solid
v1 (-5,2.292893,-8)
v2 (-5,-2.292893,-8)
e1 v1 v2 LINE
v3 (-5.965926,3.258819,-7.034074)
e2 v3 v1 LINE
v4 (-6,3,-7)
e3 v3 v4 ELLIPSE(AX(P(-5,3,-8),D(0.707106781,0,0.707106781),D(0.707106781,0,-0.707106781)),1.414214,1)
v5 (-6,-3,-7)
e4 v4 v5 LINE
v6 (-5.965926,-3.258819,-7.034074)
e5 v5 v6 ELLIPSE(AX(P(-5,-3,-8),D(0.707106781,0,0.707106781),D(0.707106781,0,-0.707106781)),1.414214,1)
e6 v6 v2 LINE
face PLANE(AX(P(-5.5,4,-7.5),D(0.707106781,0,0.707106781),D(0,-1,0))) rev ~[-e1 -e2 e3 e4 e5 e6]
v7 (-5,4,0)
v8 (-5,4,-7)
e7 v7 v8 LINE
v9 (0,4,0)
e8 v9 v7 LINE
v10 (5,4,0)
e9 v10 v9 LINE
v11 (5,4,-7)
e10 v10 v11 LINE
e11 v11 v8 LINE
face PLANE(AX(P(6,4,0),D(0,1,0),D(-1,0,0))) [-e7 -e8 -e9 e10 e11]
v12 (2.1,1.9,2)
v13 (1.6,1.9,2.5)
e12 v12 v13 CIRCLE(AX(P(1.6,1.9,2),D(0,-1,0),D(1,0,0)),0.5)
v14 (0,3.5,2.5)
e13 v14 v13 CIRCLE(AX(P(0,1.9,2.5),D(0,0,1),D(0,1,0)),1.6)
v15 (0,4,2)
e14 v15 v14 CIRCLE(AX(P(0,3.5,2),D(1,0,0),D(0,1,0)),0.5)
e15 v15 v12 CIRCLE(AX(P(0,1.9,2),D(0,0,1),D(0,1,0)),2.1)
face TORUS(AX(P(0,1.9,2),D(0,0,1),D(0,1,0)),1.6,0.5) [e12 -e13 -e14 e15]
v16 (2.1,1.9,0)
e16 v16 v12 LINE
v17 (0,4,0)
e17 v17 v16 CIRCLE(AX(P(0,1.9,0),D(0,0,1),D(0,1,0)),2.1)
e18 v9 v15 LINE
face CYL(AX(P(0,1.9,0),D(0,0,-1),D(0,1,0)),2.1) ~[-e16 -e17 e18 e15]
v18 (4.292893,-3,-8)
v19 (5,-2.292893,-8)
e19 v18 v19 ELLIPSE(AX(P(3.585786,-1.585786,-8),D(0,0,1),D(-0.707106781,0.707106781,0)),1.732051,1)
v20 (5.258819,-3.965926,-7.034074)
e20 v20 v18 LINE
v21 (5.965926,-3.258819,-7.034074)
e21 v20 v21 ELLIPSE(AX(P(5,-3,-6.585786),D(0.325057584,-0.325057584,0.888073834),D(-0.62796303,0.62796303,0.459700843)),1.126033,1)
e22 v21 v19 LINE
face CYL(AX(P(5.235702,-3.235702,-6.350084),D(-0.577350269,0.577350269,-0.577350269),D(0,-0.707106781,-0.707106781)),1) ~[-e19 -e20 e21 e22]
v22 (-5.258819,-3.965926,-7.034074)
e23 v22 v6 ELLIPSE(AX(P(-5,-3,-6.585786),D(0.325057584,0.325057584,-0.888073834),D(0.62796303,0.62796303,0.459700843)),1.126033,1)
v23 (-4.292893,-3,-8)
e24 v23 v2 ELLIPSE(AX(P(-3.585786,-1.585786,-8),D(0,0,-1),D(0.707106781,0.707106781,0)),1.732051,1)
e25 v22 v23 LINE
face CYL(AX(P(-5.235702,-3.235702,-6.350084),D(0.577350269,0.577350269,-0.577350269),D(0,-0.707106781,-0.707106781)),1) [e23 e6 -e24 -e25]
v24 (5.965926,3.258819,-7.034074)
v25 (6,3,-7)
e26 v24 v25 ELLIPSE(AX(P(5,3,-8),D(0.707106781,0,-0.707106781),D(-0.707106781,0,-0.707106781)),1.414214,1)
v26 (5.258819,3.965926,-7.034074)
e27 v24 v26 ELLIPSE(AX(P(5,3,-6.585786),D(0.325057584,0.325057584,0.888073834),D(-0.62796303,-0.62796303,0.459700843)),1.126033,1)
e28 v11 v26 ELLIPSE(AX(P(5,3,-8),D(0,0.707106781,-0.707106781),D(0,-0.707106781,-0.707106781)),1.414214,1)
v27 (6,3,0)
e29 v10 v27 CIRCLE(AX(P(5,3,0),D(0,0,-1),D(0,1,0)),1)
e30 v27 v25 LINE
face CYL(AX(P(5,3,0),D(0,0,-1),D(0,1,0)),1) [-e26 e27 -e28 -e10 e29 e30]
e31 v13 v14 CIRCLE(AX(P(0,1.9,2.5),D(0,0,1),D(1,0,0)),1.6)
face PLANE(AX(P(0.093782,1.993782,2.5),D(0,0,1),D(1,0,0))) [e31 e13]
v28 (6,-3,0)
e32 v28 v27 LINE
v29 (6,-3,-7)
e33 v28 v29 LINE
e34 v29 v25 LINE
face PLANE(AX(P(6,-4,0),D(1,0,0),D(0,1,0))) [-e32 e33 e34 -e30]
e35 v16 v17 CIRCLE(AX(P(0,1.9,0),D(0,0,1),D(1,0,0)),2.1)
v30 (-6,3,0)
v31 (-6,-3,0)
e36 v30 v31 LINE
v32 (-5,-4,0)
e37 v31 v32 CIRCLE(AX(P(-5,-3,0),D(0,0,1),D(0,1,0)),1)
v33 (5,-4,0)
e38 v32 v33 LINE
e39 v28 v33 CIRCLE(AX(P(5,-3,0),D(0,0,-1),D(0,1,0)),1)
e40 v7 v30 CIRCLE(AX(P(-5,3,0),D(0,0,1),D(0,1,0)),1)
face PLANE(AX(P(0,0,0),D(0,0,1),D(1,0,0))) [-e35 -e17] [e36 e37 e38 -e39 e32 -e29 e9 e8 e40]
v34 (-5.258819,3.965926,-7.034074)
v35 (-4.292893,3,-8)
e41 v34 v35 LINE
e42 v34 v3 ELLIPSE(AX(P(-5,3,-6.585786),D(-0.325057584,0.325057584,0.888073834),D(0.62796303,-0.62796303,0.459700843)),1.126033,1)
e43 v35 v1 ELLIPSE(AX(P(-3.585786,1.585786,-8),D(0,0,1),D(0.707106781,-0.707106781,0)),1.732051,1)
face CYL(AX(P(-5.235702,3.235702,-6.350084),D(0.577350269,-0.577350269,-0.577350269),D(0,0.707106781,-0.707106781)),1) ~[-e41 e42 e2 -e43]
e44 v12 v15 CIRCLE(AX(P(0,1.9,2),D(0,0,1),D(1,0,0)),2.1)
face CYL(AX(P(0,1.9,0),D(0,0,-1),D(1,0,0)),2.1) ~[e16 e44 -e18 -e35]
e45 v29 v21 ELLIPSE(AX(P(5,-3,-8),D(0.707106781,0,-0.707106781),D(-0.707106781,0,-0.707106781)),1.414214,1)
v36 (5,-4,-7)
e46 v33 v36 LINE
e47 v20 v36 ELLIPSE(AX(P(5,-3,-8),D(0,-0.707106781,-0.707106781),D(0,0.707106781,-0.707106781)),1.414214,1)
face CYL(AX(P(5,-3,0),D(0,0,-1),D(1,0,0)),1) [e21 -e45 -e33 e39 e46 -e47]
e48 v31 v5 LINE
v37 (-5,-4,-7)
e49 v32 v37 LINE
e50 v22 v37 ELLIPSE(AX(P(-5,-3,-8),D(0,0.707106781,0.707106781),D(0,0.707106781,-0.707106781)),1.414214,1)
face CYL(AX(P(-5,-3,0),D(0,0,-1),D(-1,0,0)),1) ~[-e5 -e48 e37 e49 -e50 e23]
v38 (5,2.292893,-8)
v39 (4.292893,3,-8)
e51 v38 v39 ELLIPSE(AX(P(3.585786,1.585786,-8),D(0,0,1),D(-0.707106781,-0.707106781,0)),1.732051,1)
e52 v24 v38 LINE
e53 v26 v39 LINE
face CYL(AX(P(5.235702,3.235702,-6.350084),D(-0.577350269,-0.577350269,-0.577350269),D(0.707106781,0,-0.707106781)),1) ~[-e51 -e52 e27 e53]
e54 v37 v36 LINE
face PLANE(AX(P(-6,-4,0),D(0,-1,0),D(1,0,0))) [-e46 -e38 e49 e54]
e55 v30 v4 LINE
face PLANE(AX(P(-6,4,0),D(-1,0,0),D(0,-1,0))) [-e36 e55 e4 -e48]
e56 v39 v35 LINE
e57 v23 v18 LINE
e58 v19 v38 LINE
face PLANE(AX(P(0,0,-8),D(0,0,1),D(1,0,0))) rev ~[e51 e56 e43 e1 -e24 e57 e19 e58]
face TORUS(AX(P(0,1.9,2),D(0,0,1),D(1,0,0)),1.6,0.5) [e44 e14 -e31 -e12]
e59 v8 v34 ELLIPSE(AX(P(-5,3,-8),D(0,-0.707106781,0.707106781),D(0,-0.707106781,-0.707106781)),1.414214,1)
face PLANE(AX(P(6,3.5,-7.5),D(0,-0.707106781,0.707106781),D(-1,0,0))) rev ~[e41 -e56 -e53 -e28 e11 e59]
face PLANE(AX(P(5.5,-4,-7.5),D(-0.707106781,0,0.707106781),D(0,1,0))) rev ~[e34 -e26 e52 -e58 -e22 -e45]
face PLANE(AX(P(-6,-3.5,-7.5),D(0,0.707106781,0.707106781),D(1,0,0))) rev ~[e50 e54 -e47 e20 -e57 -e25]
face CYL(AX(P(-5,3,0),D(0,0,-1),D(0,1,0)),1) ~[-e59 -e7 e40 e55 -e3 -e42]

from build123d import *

# Parameters (mm, degrees)
F1_DEPTH = 8
F2_DEPTH = 2.5
F3_R     = 0.5
F4_SIZE  = 1
F5_F1_R  = 1
F5_F2_R  = 1
F5_F3_R  = 1
F5_F4_R  = 1
F5_F5_R  = 1
F5_F6_R  = 1
F5_F7_R  = 1
F5_F8_R  = 1


with BuildPart() as f1:
    # F0 (on Top) → F1 (new body)
    with BuildSketch(Plane.XY):
        Polygon((-6, -4), (6, -4), (6, 4), (0, 4), (-6, 4), align=None)
        with BuildLine():
            ThreePointArc((2.1, 1.9), (-1.4849242405, 0.4150757595), (0, 4))
            ThreePointArc((0, 4), (1.4849242405, 3.3849242405), (2.1, 1.9))
        make_face(mode=Mode.SUBTRACT)
        with BuildLine():
            ThreePointArc((2.1, 1.9), (1.4849242405, 3.3849242405), (0, 4))
            ThreePointArc((0, 4), (-1.4849242405, 0.4150757595), (2.1, 1.9))
        make_face()
    extrude(amount=-F1_DEPTH)

    # F0 (on Top) → F2 (join)
    with BuildSketch(Plane.XY):
        with BuildLine():
            ThreePointArc((2.1, 1.9), (1.4849242405, 3.3849242405), (0, 4))
            ThreePointArc((0, 4), (-1.4849242405, 0.4150757595), (2.1, 1.9))
        make_face()
    extrude(amount=F2_DEPTH)

    # F3
    f3_edges = [f1.edges().sort_by_distance(p)[0] for p in [
        (-2.1, 1.9, 2.5),
    ]]
    fillet(f3_edges, radius=F3_R)

    # F4
    f4_edges = [f1.edges().sort_by_distance(p)[0] for p in [
        (-6, 0, -8),
        (0, -4, -8),
        (0, 4, -8),
        (6, 0, -8),
    ]]
    chamfer(f4_edges, length=F4_SIZE)

    # F5: fillet of radius 1 on 8 edges, made by hand

    # F5_f1
    f5_f1_edges = [f1.edges().sort_by_distance(p)[0] for p in [
        (6, 4, -3.5),
    ]]
    fillet(f5_f1_edges, radius=F5_F1_R)

    # F5_f2
    f5_f2_edges = [f1.edges().sort_by_distance(p)[0] for p in [
        (-6, 4, -3.5),
    ]]
    fillet(f5_f2_edges, radius=F5_F2_R)

    # F5_f3
    f5_f3_edges = [f1.edges().sort_by_distance(p)[0] for p in [
        (6, -4, -3.5),
    ]]
    fillet(f5_f3_edges, radius=F5_F3_R)

    # F5_f4
    f5_f4_edges = [f1.edges().sort_by_distance(p)[0] for p in [
        (5.3535533906, 3.3535533906, -7.6464466094),
    ]]
    fillet(f5_f4_edges, radius=F5_F4_R)

    # F5_f5
    f5_f5_edges = [f1.edges().sort_by_distance(p)[0] for p in [
        (-5.3535533906, 3.3535533906, -7.6464466094),
    ]]
    fillet(f5_f5_edges, radius=F5_F5_R)

    # F5_f6
    f5_f6_edges = [f1.edges().sort_by_distance(p)[0] for p in [
        (-6, -4, -3.5),
    ]]
    fillet(f5_f6_edges, radius=F5_F6_R)

    # F5_f7
    f5_f7_edges = [f1.edges().sort_by_distance(p)[0] for p in [
        (5.3535533906, -3.3535533906, -7.6464466094),
    ]]
    fillet(f5_f7_edges, radius=F5_F7_R)

    # F5_f8
    f5_f8_edges = [f1.edges().sort_by_distance(p)[0] for p in [
        (-5.3535533906, -3.3535533906, -7.6464466094),
    ]]
    fillet(f5_f8_edges, radius=F5_F8_R)


solid = f1.part
